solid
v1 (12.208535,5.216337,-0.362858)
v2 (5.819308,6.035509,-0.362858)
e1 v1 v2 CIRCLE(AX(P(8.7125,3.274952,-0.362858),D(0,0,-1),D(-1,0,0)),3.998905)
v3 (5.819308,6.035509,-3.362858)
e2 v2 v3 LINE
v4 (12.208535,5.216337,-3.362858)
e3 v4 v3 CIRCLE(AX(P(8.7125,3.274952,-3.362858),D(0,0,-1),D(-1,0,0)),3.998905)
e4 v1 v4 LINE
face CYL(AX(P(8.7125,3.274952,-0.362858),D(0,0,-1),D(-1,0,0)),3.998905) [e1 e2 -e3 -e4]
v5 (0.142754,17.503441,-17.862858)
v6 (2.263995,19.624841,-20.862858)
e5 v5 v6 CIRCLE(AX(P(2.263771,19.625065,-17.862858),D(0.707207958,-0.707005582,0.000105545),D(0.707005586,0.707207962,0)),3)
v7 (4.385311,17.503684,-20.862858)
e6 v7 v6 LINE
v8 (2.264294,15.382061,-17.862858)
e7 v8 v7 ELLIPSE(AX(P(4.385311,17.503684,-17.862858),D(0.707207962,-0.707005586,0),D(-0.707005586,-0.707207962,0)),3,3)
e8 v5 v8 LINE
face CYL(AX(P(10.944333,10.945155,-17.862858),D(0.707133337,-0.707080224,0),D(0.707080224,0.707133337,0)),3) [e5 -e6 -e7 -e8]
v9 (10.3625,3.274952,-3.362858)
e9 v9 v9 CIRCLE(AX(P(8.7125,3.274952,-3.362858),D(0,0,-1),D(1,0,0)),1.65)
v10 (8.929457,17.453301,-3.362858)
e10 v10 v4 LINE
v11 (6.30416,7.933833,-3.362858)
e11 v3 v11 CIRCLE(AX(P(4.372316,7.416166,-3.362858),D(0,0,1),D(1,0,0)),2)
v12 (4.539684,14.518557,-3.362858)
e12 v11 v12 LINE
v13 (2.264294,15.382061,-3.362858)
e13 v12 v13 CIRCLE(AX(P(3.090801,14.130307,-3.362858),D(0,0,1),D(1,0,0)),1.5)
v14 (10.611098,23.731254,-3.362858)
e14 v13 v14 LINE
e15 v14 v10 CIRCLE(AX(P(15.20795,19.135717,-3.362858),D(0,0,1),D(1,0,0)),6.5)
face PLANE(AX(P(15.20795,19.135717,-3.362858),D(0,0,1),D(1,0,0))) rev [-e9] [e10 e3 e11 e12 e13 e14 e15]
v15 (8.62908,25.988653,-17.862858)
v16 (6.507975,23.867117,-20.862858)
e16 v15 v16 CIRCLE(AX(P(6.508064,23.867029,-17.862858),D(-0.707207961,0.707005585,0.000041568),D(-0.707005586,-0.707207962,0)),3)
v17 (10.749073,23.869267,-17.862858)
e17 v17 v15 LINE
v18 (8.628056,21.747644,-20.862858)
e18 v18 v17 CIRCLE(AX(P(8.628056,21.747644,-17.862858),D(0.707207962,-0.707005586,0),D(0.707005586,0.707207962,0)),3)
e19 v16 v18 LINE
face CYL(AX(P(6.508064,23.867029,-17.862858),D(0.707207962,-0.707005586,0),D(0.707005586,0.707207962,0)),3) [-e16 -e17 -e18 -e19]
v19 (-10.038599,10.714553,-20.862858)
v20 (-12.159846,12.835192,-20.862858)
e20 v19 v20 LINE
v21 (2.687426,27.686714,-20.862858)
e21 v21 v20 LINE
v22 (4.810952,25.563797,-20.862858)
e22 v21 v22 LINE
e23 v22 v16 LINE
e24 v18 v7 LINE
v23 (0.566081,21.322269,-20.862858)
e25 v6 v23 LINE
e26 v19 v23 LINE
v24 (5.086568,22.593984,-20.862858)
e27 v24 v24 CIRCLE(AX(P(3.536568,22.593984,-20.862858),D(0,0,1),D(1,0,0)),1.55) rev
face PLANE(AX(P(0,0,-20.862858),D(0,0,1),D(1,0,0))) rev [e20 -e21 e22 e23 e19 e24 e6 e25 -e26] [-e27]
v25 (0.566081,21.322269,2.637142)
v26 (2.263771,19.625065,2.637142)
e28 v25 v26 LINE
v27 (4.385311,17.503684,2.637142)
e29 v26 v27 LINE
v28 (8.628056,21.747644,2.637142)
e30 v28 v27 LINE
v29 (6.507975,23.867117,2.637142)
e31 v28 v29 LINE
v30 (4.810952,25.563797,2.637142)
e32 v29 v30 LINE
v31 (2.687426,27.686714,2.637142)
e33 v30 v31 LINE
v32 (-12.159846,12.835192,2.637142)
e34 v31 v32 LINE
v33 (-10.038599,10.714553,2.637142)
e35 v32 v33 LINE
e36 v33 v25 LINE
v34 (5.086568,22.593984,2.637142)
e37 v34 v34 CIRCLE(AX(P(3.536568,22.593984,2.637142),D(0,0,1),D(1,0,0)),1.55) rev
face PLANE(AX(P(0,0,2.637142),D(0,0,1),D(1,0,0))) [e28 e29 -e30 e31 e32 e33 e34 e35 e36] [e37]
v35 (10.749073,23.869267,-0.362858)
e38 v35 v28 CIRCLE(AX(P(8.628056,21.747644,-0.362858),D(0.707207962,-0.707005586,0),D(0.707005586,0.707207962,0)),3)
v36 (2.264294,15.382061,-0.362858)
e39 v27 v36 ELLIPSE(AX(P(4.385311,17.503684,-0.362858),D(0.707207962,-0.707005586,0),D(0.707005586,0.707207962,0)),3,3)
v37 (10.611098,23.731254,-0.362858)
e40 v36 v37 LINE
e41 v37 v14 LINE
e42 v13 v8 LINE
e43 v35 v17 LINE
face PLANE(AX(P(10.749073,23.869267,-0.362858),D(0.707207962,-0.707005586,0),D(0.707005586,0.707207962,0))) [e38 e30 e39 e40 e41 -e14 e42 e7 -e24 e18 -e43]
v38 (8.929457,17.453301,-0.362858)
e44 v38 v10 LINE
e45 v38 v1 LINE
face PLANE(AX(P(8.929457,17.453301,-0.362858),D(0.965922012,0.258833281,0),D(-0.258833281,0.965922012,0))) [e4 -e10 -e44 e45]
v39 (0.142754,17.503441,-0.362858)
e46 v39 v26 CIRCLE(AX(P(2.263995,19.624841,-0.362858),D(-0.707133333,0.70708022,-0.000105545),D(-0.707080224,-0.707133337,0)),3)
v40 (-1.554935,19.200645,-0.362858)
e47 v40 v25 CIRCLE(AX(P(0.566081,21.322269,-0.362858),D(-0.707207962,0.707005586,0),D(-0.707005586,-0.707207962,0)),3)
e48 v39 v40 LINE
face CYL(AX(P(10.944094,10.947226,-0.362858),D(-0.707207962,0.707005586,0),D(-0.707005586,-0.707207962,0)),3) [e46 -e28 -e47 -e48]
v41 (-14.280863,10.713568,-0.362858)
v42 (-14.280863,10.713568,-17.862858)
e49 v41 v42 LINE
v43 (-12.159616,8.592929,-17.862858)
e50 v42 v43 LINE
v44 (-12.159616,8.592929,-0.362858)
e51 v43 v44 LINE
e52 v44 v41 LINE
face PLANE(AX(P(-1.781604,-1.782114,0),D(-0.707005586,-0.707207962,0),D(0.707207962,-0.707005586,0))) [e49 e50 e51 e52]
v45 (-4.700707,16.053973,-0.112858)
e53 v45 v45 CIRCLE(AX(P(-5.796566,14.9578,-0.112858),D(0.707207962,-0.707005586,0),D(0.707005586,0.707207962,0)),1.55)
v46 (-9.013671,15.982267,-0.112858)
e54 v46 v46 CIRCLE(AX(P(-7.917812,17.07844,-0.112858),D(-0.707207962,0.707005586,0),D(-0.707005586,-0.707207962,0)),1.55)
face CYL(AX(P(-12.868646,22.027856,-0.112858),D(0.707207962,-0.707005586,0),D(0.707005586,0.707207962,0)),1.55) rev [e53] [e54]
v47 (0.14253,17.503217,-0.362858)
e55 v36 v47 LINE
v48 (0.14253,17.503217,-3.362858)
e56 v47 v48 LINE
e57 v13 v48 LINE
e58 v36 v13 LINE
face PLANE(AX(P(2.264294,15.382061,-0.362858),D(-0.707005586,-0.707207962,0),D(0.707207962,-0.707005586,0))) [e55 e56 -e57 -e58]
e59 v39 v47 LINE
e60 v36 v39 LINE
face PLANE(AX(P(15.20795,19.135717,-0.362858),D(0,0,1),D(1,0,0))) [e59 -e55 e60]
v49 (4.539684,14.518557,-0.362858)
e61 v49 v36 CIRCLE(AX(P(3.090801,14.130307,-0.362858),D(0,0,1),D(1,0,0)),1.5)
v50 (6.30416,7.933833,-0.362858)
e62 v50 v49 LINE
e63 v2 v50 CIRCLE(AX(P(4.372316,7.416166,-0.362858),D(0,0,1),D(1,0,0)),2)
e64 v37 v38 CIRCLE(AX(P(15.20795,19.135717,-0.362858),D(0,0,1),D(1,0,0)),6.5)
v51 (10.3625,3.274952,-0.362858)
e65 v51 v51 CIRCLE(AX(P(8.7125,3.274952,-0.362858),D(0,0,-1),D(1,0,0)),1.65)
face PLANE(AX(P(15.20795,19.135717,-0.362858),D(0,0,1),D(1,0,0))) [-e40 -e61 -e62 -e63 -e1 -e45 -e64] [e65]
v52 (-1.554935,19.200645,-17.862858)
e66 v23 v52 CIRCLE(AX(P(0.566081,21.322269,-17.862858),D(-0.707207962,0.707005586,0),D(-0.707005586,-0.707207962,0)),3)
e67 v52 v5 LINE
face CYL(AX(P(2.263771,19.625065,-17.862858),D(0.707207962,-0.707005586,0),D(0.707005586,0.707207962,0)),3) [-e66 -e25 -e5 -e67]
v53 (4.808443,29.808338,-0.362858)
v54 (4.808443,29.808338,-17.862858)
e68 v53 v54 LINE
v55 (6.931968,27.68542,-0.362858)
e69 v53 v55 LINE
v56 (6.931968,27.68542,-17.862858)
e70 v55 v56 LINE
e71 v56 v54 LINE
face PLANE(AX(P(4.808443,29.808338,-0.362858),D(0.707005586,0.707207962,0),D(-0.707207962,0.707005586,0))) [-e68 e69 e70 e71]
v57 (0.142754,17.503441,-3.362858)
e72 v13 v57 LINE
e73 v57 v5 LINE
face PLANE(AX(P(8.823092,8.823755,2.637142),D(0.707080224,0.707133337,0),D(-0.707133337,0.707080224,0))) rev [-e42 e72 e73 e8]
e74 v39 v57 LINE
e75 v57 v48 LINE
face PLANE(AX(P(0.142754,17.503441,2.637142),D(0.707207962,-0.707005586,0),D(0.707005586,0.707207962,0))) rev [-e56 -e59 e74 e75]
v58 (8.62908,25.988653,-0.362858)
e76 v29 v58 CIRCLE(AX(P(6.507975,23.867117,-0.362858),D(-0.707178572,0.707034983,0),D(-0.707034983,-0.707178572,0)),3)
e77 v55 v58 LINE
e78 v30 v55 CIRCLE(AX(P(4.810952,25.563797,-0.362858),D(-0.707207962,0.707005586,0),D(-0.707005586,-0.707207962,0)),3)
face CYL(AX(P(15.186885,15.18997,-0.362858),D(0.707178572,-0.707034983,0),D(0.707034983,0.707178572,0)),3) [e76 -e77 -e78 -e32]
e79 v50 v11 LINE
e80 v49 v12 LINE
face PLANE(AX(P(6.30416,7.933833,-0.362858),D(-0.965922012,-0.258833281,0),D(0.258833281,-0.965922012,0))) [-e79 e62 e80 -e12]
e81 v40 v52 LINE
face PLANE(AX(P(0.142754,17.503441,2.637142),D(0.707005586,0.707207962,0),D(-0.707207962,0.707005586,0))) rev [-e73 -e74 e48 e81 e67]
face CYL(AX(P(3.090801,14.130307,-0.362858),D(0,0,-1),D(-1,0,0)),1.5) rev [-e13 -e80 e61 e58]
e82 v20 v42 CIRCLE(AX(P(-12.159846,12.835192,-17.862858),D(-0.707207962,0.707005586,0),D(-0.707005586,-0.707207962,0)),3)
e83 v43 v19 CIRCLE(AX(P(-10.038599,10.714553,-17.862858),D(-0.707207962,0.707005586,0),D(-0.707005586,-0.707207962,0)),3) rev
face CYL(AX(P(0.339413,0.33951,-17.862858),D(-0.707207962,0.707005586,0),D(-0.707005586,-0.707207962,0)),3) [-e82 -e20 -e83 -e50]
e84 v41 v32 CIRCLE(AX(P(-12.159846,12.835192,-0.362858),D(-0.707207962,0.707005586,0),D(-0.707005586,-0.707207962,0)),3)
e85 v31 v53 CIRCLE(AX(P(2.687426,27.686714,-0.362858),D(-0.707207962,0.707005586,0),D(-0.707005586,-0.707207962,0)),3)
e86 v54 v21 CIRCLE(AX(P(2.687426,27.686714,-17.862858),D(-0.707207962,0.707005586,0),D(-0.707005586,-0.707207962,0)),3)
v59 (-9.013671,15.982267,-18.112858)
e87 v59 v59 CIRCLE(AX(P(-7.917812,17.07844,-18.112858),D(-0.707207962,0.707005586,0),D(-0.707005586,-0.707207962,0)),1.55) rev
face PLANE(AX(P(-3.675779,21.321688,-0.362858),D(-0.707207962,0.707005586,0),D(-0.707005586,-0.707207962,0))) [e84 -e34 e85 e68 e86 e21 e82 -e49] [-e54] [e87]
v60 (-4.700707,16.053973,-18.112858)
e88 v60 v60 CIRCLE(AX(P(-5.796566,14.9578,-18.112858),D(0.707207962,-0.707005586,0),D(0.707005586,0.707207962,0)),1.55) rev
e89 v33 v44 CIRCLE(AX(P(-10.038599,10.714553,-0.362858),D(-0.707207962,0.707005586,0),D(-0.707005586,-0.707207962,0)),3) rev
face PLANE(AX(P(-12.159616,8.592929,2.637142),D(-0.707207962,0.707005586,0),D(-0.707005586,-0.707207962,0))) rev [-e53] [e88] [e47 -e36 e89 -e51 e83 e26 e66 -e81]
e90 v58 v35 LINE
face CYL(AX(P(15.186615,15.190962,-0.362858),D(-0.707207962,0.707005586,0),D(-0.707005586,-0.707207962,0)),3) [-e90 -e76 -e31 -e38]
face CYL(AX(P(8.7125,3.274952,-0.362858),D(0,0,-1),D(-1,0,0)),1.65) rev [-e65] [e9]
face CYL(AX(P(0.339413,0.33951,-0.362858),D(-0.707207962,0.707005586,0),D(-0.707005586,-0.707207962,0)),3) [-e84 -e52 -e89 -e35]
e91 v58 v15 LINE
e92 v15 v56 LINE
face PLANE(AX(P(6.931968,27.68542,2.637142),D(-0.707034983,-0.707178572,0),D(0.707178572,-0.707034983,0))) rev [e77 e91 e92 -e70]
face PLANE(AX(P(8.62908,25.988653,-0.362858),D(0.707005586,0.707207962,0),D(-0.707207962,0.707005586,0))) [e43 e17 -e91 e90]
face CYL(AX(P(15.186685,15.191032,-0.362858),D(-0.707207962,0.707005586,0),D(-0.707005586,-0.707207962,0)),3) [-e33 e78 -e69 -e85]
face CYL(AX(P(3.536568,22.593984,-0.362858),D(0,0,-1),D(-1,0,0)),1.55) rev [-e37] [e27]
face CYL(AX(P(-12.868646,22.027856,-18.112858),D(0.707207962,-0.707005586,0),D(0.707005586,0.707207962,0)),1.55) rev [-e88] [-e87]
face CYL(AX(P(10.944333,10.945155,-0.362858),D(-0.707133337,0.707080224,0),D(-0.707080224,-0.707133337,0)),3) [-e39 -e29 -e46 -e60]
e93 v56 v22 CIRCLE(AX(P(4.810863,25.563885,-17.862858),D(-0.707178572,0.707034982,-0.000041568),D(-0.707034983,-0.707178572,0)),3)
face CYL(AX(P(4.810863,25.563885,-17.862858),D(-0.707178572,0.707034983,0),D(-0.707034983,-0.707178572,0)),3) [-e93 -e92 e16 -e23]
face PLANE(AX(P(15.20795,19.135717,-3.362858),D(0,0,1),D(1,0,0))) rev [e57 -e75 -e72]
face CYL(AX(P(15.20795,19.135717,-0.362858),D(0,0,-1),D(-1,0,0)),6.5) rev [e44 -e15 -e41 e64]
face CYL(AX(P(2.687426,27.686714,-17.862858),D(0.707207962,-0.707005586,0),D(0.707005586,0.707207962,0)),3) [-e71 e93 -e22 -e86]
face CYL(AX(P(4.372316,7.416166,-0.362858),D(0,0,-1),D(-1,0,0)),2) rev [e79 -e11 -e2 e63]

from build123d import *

# Parameters (mm, degrees)
SKETCH_1_R           = 1.55
SKETCH_1_R_2         = 1.65
EXTRUDE_1_DEPTH      = 3
EXTRUDE_5_DEPTH      = 3
EXTRUDE_5_DEPTH_BACK = 20.5
SKETCH_2_R           = 1.55
SKETCH_3_W           = 2.999466183
SKETCH_3_H           = 23.5
EXTRUDE_9_DEPTH      = 15
CUT_EXTRUDE_1_DEPTH  = 43.137686458
CUT_EXTRUDE_2_DEPTH  = 41.555271529
SKETCH_6_R           = 1.55
CUT_EXTRUDE_3_DEPTH  = 10
FILLET_1_R           = 3
FILLET_2_R           = 3
FILLET_3_R           = 3


with BuildPart() as part:
    # 草图1 → 凸台-拉伸1 (new body)
    with BuildSketch(Plane(origin=(0, 0, -3.362857667), x_dir=(-1, 0, 0), z_dir=(0, 0, -1))):
        with BuildLine():
            Line((-8.929456987, 17.45330102), (-12.208534908, 5.216337034))
            ThreePointArc((-12.208534908, 5.216337034), (-8.203956956, -0.691485495), (-5.819308033, 6.03550946))
            ThreePointArc((-5.819308033, 6.03550946), (-6.310108859, 6.921233679), (-6.304159928, 7.933833034))
            Line((-6.304159928, 7.933833034), (-4.539684391, 14.518557193))
            ThreePointArc((-4.539684391, 14.518557193), (-3.62301138, 15.532716808), (-2.264294404, 15.382060533))
            Line((-2.264294404, 15.382060533), (-0.142530428, 17.503217343))
            Line((-0.142530428, 17.503217343), (4.099819599, 13.25965297))
            Line((4.099819599, 13.25965297), (5.797509256, 14.956856814))
            Line((5.797509256, 14.956856814), (1.554532399, 19.201048196))
            Line((1.554532399, 19.201048196), (3.675778765, 21.321687543))
            Line((3.675778765, 21.321687543), (-4.808443123, 29.808337985))
            Line((-4.808443123, 29.808337985), (-6.931968366, 27.685420414))
            Line((-6.931968366, 27.685420414), (-11.173246227, 31.927912314))
            Line((-11.173246227, 31.927912314), (-12.870428791, 30.231215419))
            Line((-12.870428791, 30.231215419), (-8.629080401, 25.98865297))
            Line((-8.629080401, 25.98865297), (-10.749072595, 23.869267436))
            Line((-10.749072595, 23.869267436), (-10.611098311, 23.731253658))
            ThreePointArc((-10.611098311, 23.731253658), (-8.929299443, 20.817545637), (-8.929456987, 17.45330102))
        make_face()
        with Locations(Location((-3.536567574, 22.593983824, 0), (0, 0, 180))):
            Circle(SKETCH_1_R, mode=Mode.SUBTRACT)
        with Locations(Location((-8.71249984, 3.274951558, 0), (0, 0, 180))):
            Circle(SKETCH_1_R_2, mode=Mode.SUBTRACT)
    extrude(amount=-EXTRUDE_1_DEPTH)

    # 草图2 → 凸台-拉伸5 (add, two sides: drawn at the far end of the back side and taken through both)
    with BuildSketch(Plane.XY.offset(-0.362857667).offset(-EXTRUDE_5_DEPTH_BACK)):
        Polygon((6.931968366, 27.685420414), (4.808443123, 29.808337985), (-3.675778765, 21.321687543), (-1.554532399, 19.201048196), (-1.554756221, 19.20082431), (-5.797509256, 14.956856814), (-4.099819599, 13.25965297), (0.142530428, 17.503217343), (0.142754305, 17.503441284), (2.264294404, 15.382060533), (10.611098311, 23.731253658), (10.748516293, 23.868710975), (10.749072595, 23.869267436), (8.629080401, 25.98865297), (12.870358263, 30.23114487), (11.173246227, 31.927912314), align=None)
        with Locations((3.536567574, 22.593983824)):
            Circle(SKETCH_2_R, mode=Mode.SUBTRACT)
    extrude(amount=EXTRUDE_5_DEPTH + EXTRUDE_5_DEPTH_BACK)

    # 草图3 → 凸台-拉伸9 (add)
    with BuildSketch(Plane(origin=(8.823479961, 8.826005625, 0), x_dir=(0.7072079618145243, -0.7070055860784599, 0), z_dir=(-0.7070055860784599, -0.7072079618145243, 0))):
        with Locations((-16.174359114, -9.112857667)):
            Rectangle(SKETCH_3_W, SKETCH_3_H)
    extrude(amount=EXTRUDE_9_DEPTH)

    # 草图4 → 切除-拉伸1 (cut, through all)
    with BuildSketch(Plane(origin=(0, 0, -20.862857667), x_dir=(-1, 0, 0), z_dir=(0, 0, -1))):
        Polygon((-11.306274604, 32.060978769), (-13.003386639, 30.364211325), (-8.629080401, 25.98865297), (-6.931968366, 27.685420414), align=None)
    extrude(amount=-CUT_EXTRUDE_1_DEPTH, mode=Mode.SUBTRACT)

    # 草图5 → 切除-拉伸2 (cut, through all)
    with BuildSketch(Plane(origin=(0, 0, -20.862857667), x_dir=(-1, 0, 0), z_dir=(0, 0, -1))):
        Polygon((-0.142754305, 17.503441284), (4.099819599, 13.25965297), (5.797509256, 14.956856814), (1.554935352, 19.200645127), align=None)
    extrude(amount=-CUT_EXTRUDE_2_DEPTH, mode=Mode.SUBTRACT)

    # 草图6 → 切除-拉伸3 (cut)
    with BuildSketch(Plane(origin=(-10.37801236, 10.375042572, 0), x_dir=(0, 0, -1), z_dir=(0.7072079618145242, -0.7070055860784599, 0))):
        with Locations(Location((0.112857667, 6.48007107, 0), (0, 0, 90))):
            Circle(SKETCH_6_R)
        with Locations(Location((18.112857667, 6.48007107, 0), (0, 0, 90))):
            Circle(SKETCH_6_R)
    extrude(amount=-CUT_EXTRUDE_3_DEPTH, mode=Mode.SUBTRACT)

    # 圆角1
    fillet_1_edges = [part.edges().sort_by_distance(p)[0] for p in [
        (-0.706090524, 18.352043206, 2.637142333),
        (-0.706090524, 18.352043206, -20.862857667),
        (1.203524355, 16.442750908, -20.862857667),
        (1.203524355, 16.442750908, 2.637142333),
    ]]
    fillet(fillet_1_edges, radius=FILLET_1_R - 0.0001)  # a hair under: the kernel refuses the full size

    # 圆角2
    fillet_2_edges = [part.edges().sort_by_distance(p)[0] for p in [
        (7.780524383, 26.837036692, 2.637142333),
        (7.780524383, 26.837036692, -20.862857667),
        (9.689076498, 24.928960203, -20.862857667),
        (5.870205744, 28.746879199, -20.862857667),
        (9.689076498, 24.928960203, 2.637142333),
        (5.870205744, 28.746879199, 2.637142333),
    ]]
    fillet(fillet_2_edges, radius=FILLET_2_R)

    # 圆角3
    fillet_3_edges = [part.edges().sort_by_distance(p)[0] for p in [
        (-13.220239373, 9.653248443, -20.862857667),
        (-13.220239373, 9.653248443, 2.637142333),
    ]]
    fillet(fillet_3_edges, radius=FILLET_3_R)


solid = part.part
